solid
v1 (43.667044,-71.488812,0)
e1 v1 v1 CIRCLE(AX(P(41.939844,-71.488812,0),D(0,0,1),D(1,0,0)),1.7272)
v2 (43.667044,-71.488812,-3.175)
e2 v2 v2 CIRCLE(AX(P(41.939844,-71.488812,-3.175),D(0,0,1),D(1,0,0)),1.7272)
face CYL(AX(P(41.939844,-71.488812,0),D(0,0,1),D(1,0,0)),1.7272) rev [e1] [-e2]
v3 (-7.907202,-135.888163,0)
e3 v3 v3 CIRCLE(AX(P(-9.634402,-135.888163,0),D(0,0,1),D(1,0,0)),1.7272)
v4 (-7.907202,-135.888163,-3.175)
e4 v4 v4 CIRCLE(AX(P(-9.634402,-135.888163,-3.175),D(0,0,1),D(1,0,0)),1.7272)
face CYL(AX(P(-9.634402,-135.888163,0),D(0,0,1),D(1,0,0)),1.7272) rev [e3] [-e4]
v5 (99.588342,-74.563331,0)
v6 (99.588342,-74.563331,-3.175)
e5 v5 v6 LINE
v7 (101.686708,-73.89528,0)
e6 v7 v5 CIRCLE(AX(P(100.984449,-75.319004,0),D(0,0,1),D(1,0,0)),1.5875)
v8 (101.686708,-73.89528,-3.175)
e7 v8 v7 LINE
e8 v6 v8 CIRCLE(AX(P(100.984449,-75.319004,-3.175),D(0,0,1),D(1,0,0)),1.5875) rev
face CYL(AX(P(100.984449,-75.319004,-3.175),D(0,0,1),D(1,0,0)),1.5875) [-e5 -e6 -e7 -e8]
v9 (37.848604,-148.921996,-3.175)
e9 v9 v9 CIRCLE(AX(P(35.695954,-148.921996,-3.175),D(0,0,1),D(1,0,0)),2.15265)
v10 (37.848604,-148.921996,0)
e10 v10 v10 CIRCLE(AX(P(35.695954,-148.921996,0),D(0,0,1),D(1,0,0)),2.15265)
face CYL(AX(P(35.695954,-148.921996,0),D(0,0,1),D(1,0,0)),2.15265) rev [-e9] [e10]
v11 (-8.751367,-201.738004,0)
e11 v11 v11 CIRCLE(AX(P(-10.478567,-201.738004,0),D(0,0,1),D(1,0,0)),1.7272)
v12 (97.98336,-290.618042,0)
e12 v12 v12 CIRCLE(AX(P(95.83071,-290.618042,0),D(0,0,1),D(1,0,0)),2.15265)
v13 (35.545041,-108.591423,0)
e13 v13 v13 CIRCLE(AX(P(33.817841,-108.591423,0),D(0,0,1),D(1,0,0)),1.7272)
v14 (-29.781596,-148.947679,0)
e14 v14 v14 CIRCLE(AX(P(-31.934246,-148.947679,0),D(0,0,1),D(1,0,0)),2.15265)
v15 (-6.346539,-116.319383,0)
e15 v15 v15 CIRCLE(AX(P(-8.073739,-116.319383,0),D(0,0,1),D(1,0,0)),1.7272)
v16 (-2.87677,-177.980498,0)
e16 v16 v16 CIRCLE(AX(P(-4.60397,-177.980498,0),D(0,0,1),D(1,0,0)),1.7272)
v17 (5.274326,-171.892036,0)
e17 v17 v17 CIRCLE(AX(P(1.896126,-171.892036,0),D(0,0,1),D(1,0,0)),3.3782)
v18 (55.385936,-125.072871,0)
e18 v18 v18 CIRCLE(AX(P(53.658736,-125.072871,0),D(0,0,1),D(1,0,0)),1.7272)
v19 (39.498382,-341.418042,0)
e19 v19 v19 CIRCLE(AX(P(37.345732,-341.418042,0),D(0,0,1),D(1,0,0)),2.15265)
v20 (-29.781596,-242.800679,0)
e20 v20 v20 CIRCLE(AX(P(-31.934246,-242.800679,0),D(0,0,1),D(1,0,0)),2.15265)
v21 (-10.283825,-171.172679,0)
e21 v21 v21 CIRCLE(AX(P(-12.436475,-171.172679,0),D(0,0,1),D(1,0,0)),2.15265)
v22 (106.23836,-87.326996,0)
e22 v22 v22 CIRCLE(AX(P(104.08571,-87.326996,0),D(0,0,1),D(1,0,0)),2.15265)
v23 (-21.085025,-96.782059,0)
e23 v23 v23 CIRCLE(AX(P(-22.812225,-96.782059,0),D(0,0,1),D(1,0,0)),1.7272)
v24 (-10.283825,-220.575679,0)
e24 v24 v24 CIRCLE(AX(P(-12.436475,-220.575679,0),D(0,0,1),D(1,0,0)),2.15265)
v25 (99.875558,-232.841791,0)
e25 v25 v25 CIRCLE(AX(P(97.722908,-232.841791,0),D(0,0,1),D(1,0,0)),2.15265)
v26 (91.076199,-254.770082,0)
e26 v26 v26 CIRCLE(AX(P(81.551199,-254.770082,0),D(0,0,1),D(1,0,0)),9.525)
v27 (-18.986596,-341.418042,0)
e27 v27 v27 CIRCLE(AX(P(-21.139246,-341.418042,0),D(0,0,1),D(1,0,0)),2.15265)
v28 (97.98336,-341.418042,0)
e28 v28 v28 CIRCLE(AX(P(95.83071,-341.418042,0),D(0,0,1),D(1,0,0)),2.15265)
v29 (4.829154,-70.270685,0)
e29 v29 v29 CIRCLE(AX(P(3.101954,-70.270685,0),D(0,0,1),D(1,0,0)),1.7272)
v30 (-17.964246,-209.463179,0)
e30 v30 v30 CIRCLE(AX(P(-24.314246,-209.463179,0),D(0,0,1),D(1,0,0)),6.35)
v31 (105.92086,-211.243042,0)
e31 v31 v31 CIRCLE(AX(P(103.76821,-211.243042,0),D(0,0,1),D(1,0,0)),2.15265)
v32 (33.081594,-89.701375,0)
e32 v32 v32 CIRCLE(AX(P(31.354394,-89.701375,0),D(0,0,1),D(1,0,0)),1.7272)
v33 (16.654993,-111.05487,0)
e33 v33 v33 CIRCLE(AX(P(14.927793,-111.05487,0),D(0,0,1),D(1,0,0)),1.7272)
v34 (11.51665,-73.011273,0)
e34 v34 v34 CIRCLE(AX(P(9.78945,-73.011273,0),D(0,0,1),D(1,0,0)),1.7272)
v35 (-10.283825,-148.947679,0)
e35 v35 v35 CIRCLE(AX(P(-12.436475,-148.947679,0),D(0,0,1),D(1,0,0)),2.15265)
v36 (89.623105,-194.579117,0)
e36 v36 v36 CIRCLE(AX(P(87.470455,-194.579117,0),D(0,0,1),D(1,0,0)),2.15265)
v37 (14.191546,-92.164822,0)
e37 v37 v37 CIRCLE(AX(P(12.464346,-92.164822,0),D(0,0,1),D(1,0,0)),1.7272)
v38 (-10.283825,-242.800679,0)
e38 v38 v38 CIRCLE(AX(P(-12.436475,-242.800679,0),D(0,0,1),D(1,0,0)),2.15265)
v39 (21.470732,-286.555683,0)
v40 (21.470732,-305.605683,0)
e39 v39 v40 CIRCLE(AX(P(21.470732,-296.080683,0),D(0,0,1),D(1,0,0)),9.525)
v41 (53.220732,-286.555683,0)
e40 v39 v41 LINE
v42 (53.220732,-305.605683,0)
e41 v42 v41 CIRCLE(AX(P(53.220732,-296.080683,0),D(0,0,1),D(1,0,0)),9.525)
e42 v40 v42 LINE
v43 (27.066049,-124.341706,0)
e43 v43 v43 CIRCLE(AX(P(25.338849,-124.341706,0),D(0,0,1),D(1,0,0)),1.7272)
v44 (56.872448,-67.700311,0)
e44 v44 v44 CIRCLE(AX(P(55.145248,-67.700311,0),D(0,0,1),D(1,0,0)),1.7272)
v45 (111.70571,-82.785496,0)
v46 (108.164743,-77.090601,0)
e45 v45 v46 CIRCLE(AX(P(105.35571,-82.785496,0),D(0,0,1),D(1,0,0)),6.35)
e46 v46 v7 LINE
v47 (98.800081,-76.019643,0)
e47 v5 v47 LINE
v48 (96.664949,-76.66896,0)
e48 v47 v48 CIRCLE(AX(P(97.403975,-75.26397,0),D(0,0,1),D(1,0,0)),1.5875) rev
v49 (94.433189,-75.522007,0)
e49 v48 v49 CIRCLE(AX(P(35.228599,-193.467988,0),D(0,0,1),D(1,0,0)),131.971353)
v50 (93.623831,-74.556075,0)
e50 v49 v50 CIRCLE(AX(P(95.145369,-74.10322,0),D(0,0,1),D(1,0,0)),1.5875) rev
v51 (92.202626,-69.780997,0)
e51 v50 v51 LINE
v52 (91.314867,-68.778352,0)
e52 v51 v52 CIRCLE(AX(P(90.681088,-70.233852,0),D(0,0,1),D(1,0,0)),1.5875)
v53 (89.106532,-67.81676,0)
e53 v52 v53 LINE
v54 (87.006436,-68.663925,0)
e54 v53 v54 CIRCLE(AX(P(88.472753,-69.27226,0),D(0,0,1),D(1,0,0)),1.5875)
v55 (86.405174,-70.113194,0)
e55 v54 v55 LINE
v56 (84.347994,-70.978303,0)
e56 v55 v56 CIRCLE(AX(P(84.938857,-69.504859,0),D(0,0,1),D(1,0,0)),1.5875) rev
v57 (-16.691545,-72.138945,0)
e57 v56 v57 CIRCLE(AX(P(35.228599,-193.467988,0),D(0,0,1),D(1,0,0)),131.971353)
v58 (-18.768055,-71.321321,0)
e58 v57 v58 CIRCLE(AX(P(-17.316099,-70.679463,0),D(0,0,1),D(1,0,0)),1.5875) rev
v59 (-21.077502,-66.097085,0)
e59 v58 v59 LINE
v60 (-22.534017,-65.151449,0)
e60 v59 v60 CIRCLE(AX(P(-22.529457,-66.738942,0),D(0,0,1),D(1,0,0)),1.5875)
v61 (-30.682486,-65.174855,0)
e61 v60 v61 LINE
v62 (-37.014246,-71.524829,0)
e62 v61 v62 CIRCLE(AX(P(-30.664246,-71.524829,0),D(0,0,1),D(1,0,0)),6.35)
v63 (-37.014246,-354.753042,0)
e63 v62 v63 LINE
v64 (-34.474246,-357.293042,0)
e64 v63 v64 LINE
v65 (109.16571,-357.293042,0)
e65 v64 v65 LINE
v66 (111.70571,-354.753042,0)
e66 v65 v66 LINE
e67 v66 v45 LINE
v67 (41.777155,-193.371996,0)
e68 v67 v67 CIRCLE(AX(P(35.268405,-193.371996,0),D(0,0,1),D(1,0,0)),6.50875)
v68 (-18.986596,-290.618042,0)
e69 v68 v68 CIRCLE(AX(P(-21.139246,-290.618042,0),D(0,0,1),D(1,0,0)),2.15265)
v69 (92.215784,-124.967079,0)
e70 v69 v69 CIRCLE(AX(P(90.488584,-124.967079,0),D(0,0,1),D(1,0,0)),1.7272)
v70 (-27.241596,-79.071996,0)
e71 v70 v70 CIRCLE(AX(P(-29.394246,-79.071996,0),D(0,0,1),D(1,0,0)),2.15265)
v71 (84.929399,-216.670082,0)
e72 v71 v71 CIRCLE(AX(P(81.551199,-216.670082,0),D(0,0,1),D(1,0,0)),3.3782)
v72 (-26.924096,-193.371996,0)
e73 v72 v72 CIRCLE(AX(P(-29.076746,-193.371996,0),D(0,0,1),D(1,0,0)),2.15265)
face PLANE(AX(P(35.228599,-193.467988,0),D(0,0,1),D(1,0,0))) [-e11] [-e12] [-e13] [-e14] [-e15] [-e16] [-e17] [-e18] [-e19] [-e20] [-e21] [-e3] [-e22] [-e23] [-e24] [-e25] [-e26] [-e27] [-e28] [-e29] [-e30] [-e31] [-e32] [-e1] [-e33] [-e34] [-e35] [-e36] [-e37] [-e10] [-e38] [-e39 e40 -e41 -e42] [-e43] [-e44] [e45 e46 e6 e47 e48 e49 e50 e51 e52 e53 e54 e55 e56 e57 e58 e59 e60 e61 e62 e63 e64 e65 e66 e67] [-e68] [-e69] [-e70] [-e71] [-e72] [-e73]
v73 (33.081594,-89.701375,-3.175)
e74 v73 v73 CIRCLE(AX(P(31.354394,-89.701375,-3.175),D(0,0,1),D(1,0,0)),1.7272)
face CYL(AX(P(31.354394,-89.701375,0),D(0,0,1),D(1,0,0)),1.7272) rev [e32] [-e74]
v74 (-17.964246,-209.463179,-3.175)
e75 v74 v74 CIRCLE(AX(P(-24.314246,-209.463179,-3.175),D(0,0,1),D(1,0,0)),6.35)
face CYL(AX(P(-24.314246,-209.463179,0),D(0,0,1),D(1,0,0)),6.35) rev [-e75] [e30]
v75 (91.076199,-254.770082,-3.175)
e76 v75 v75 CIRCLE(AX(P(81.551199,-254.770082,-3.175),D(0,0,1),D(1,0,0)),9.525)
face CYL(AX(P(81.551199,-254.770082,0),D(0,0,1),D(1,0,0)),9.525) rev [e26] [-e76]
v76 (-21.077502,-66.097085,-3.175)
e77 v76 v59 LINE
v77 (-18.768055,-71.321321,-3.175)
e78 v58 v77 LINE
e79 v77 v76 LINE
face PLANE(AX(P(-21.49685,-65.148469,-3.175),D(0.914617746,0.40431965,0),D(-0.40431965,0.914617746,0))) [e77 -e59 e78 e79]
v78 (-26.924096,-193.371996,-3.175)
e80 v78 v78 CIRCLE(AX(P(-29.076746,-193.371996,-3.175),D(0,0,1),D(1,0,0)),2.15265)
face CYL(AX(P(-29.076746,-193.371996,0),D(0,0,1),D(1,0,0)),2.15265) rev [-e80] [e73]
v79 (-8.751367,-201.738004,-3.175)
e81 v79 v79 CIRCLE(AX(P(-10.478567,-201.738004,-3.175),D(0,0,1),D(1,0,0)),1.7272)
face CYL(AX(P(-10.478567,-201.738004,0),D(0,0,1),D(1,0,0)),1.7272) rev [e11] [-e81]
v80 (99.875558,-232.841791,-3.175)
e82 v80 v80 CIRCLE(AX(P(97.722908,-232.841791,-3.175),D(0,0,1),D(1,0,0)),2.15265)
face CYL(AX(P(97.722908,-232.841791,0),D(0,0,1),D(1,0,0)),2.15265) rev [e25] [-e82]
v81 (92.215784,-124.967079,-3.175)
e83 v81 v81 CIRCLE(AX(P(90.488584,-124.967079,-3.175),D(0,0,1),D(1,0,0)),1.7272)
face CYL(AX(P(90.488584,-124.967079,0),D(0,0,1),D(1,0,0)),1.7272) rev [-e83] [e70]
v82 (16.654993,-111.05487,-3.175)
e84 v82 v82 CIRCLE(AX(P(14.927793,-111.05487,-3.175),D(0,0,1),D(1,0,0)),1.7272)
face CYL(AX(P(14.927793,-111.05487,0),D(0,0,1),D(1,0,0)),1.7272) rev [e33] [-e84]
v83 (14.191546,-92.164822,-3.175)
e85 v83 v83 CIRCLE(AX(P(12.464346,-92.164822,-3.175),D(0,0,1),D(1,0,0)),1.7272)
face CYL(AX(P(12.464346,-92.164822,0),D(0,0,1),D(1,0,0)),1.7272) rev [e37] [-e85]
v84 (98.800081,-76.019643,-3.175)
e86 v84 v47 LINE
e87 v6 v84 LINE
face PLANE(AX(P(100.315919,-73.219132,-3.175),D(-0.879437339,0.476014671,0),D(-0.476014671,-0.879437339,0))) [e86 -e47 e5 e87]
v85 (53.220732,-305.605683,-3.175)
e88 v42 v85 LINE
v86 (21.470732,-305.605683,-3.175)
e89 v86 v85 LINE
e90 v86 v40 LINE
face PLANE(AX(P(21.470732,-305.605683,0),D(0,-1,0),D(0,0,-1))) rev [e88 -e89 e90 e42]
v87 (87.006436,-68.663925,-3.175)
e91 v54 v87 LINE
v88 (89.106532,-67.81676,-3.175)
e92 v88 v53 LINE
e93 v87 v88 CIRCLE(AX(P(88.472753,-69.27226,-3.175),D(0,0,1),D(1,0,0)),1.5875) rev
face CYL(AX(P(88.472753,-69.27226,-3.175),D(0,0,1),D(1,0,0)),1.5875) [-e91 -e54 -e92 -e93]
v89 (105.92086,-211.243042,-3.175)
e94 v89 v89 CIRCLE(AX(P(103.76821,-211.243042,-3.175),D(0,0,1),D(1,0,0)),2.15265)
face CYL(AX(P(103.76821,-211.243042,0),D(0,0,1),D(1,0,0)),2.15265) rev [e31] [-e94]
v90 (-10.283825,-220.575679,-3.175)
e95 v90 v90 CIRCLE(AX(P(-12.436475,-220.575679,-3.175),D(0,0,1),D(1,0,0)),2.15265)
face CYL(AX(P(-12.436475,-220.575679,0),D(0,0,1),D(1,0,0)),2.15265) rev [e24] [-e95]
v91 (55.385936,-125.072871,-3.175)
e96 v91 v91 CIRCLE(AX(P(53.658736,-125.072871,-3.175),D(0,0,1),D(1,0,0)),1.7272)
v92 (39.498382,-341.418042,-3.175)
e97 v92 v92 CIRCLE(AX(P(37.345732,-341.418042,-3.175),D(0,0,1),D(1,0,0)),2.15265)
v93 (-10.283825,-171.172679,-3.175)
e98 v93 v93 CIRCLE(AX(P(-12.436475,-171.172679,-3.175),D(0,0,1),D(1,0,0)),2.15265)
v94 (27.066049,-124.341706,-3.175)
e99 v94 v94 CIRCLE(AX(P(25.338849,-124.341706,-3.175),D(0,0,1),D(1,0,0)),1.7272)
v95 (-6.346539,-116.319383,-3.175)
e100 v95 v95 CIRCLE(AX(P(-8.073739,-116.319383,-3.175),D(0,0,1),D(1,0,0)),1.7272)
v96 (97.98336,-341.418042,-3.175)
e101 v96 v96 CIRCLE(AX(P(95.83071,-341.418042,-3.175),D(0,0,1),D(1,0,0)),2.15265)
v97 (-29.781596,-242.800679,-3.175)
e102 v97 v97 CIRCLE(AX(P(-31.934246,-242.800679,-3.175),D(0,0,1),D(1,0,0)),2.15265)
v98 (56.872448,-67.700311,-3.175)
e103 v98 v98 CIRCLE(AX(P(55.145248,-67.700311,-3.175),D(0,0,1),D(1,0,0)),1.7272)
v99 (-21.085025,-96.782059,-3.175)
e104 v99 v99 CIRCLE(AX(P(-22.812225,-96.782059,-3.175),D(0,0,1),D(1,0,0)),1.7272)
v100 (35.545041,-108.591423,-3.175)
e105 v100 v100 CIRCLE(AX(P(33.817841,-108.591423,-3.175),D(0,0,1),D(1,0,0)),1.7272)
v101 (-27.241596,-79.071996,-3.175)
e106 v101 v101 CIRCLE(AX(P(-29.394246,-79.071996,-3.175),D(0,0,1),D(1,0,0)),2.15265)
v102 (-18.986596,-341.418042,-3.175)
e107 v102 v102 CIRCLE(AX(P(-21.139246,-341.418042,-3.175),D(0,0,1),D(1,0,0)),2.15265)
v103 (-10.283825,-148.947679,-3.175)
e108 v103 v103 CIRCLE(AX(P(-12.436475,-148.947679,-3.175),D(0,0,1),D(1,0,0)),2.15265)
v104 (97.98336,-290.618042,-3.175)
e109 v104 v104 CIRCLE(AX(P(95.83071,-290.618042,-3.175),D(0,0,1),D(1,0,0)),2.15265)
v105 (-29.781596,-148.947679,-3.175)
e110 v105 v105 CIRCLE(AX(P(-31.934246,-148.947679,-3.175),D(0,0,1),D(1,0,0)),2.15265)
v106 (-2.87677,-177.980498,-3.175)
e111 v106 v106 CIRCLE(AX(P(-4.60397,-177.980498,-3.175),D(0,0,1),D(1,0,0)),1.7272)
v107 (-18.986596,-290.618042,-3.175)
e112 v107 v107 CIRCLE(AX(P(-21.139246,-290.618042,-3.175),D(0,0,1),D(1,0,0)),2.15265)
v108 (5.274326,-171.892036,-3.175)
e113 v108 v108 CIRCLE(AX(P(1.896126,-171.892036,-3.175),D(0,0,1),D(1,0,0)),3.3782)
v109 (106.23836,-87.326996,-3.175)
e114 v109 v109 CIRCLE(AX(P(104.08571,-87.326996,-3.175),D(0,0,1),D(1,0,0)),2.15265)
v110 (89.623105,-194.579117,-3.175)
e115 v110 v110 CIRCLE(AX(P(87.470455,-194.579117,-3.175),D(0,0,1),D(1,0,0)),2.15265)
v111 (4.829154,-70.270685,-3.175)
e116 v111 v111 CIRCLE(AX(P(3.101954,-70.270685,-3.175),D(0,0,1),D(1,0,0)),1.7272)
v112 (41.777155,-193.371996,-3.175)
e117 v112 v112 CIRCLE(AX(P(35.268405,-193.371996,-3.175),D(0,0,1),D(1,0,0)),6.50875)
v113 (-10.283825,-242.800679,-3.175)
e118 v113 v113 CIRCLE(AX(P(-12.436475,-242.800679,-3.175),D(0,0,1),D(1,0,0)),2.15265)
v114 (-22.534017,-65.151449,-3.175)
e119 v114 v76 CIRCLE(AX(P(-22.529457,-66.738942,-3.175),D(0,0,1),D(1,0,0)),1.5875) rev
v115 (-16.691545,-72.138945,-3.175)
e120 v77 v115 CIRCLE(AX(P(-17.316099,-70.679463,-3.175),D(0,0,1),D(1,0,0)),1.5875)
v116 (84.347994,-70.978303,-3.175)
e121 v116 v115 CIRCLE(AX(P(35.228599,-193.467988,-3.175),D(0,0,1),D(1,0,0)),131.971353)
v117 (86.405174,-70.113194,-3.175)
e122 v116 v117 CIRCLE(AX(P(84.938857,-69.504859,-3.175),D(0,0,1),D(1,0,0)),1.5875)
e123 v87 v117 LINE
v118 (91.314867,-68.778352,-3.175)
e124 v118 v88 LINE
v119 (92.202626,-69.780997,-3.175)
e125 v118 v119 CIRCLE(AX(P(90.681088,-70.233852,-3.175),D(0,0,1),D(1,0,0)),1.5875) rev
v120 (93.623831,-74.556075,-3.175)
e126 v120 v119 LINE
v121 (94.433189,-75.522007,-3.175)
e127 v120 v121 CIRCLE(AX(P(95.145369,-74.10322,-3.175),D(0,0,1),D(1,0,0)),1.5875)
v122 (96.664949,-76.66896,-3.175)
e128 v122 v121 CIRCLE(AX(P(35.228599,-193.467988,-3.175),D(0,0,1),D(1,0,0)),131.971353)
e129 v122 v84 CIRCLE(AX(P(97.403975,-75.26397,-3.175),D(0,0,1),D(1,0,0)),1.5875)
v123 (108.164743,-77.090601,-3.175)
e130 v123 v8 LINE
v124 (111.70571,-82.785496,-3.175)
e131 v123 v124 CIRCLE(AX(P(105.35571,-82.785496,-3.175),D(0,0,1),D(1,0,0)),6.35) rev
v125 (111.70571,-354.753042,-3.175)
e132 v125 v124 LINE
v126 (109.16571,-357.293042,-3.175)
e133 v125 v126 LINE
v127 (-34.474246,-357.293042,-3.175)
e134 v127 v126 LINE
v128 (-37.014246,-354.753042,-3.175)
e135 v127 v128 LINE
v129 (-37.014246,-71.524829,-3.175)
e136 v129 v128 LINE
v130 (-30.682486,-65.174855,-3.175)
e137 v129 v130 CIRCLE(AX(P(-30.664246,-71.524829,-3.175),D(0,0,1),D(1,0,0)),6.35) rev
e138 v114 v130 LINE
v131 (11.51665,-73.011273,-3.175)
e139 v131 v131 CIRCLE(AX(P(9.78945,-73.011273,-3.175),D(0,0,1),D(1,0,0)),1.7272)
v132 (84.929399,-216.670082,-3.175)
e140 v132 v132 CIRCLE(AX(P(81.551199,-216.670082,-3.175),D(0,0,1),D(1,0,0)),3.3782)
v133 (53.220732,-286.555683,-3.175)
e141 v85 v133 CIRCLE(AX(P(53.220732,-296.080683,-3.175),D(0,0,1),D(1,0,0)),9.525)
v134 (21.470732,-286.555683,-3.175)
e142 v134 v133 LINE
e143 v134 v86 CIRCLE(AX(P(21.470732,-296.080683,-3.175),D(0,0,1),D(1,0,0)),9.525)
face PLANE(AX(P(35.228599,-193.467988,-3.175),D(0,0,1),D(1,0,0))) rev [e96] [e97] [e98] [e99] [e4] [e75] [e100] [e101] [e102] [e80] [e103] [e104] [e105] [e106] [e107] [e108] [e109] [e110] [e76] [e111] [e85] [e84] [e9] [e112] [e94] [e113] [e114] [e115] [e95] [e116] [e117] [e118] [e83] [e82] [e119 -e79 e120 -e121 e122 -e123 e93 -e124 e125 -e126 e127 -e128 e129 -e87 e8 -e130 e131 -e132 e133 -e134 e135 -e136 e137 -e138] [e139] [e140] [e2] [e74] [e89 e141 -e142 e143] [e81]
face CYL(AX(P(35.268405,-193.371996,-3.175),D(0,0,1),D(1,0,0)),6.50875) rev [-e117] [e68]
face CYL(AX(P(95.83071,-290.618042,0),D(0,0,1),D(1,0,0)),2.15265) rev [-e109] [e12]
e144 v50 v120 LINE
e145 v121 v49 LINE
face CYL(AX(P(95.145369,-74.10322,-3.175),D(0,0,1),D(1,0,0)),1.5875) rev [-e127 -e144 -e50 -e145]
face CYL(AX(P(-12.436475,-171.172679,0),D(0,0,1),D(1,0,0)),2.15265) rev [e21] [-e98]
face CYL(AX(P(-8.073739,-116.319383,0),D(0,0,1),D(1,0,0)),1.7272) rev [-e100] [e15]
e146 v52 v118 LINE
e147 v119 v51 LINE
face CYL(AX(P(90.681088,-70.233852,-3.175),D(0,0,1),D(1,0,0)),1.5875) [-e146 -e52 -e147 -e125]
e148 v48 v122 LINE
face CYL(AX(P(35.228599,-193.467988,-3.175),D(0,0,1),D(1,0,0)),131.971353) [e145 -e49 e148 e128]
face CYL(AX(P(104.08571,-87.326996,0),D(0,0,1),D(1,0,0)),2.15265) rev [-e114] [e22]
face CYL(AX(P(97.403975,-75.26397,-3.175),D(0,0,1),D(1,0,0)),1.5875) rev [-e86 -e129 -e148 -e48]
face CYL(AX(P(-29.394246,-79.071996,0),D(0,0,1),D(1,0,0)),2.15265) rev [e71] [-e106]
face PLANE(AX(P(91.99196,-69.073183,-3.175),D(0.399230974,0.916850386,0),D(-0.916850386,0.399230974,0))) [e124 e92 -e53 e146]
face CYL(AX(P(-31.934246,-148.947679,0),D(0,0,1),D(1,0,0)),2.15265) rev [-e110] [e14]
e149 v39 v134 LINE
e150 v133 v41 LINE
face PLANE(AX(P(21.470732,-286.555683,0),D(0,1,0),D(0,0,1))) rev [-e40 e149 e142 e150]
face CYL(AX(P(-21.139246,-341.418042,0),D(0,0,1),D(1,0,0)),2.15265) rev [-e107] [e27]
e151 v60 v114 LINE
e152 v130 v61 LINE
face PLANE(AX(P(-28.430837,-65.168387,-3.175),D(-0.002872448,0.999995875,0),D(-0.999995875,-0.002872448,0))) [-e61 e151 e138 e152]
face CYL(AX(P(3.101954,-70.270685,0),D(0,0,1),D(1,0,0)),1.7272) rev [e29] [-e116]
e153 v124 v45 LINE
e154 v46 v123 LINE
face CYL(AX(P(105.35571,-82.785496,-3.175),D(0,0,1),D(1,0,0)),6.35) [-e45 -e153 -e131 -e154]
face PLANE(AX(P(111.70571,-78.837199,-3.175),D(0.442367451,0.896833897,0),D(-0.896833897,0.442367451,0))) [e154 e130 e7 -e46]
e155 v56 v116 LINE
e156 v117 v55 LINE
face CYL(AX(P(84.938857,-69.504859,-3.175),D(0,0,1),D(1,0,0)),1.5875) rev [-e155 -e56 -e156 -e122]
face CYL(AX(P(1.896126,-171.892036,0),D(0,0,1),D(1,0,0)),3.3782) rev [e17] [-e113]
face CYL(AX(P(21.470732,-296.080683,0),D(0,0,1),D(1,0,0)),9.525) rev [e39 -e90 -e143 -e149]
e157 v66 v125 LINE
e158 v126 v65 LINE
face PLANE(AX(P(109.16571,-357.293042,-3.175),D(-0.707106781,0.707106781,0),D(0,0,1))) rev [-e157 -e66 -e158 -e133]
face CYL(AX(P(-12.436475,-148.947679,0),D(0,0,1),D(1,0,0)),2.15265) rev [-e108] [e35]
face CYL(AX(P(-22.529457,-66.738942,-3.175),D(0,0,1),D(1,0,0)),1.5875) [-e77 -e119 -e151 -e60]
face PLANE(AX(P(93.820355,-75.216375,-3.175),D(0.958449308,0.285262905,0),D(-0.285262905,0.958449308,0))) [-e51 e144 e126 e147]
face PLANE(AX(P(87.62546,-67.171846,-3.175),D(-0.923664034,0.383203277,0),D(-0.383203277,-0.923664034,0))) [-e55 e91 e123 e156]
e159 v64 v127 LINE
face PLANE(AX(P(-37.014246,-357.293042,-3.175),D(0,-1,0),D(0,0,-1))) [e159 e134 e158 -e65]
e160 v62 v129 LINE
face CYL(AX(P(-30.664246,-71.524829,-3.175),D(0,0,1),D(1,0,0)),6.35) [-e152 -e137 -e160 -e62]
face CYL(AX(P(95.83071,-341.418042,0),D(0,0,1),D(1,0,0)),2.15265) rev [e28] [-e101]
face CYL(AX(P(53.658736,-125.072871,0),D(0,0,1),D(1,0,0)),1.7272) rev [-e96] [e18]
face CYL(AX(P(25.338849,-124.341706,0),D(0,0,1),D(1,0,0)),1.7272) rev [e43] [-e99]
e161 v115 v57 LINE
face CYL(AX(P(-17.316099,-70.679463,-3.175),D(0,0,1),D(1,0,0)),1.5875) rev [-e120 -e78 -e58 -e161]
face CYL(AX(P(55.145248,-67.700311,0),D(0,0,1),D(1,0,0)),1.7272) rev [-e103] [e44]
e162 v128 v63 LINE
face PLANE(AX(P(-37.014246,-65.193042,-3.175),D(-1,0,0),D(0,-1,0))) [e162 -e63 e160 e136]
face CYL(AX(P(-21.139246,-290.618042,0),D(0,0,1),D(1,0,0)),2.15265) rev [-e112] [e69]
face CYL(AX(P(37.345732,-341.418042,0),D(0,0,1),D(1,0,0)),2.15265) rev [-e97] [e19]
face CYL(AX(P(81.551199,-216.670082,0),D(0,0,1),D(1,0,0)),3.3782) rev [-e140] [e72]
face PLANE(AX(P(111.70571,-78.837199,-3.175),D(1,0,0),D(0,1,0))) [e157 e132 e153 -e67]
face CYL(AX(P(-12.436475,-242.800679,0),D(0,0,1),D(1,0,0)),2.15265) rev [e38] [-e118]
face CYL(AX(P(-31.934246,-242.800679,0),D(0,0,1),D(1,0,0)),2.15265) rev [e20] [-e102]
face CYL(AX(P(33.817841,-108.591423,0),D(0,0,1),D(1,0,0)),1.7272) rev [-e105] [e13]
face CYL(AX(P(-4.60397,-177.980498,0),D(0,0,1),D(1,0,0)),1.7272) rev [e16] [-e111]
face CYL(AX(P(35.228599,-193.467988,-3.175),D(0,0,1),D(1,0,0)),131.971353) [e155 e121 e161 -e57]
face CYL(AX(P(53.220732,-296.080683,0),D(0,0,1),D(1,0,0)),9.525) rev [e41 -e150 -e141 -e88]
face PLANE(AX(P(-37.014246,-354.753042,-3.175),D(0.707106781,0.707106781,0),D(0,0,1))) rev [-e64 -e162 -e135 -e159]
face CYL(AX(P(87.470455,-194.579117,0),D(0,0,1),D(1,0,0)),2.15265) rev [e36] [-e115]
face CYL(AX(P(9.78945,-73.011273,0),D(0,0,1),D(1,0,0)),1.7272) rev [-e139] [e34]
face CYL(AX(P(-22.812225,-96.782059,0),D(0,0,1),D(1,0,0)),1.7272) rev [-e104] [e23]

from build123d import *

# Parameters (mm, degrees)
BOSS_EXTRUDE1_DEPTH             = 3.175
SKETCH2_R                       = 6.50875
CUT_EXTRUDE1_DEPTH              = 268.458155353
F_4_CLEARANCE_HOLE1_D           = 3.4544
F_6_CLEARANCE_HOLE2_D           = 4.3053
F_4_CLEARANCE_HOLE2_D           = 3.4544
F_1_4_CLEARANCE_HOLE2_D         = 6.7564
SKETCH15_W                      = 148.719955274
SKETCH15_H                      = 114.3
BOSS_EXTRUDE2_DEPTH             = 3.175
F_6_CLEARANCE_HOLE3_D           = 4.3053
CHAMFER1_SIZE                   = 2.54
F_6_CLEARANCE_HOLE4_D           = 4.3053
F_4_CLEARANCE_HOLE3_D           = 3.4544
F_6_CLEARANCE_HOLE1_D           = 4.3053
DELETEFACE1_START               = -3.175
DELETEFACE1_OUTLINE_R           = 2.15265
DELETEFACE1_DEPTH               = 3.175
F_1_2_0_5_DIAMETER_HOLE1_D      = 12.7
F_1_4_CLEARANCE_HOLE1_D         = 6.7564
F_3_4_0_75_DIAMETER_HOLE1_D     = 19.05
F_3_4_START                     = -3.175
F_3_4_0_75_DIAMETER_SLOT1_DEPTH = 3.175
FILLET1_R                       = 1.5875
FILLET2_R                       = 6.35


# Read off the part's stored shape, not the designer's step: DeleteFace1, 3/4 (0.75) Diameter Slot1
with BuildPart() as part:
    # Sketch1 → Boss-Extrude1 (new body)
    with BuildSketch(Plane.XY):
        with BuildLine():
            Line((-37.014245685, -65.193042462), (-37.014245685, -242.993042462))
            Line((-37.014245685, -242.993042462), (111.705709589, -242.993042462))
            Line((111.705709589, -242.993042462), (111.705709589, -78.837199032))
            Line((111.705709589, -78.837199032), (100.315919098, -73.219132409))
            Line((100.315919098, -73.219132409), (98.04889923, -77.407452736))
            ThreePointArc((98.04889923, -77.407452736), (95.944511883, -76.292837527), (93.820355363, -75.216374688))
            Line((93.820355363, -75.216374688), (91.991959695, -69.073183497))
            Line((91.991959695, -69.073183497), (87.625459733, -67.171845985))
            Line((87.625459733, -67.171845985), (85.800454124, -71.570795948))
            ThreePointArc((85.800454124, -71.570795948), (33.712742218, -61.505341345), (-18.130011823, -72.76464689))
            Line((-18.130011823, -72.76464689), (-20.055584156, -68.408779876))
            Line((-20.055584156, -68.408779876), (-21.49685031, -65.148469374))
            Line((-21.49685031, -65.148469374), (-28.430836618, -65.168386968))
            Line((-28.430836618, -65.168386968), (-37.014245685, -65.193042462))
        make_face()
    extrude(amount=-BOSS_EXTRUDE1_DEPTH)

    # Sketch2 → Cut-Extrude1 (cut, through all)
    with BuildSketch(Plane.XY):
        with Locations((35.268404938, -193.371995598)):
            Circle(SKETCH2_R)
    extrude(amount=-CUT_EXTRUDE1_DEPTH, mode=Mode.SUBTRACT)

    # #4 Clearance Hole1 (through all)
    with Locations(Plane.XY):
        with Locations((41.939844363, -71.488811907), (9.789450293, -73.011273216), (90.488583573, -124.967078721), (53.658735514, -125.072870965), (25.338848707, -124.341705755), (-9.634401538, -135.888162669), (55.145248163, -67.700310852), (3.101953943, -70.270684884)):
            Hole(F_4_CLEARANCE_HOLE1_D / 2)

    # #6 Clearance Hole2 (through all)
    with Locations(Plane.XY):
        with Locations((-29.394245685, -79.071995598), (104.085709589, -87.326995598), (35.695953558, -148.921995598), (26.485754315, -79.071995598)):
            Hole(F_6_CLEARANCE_HOLE2_D / 2)

    # #4 Clearance Hole2 (through all)
    with Locations(Plane.XY):
        with Locations((-8.073739309, -116.319383279), (-22.812224861, -96.782058908), (-10.478566815, -201.738004366), (-4.603970045, -177.980497914)):
            Hole(F_4_CLEARANCE_HOLE2_D / 2)

    # 1/4 Clearance Hole2 (through all)
    with Locations(Plane.XY):
        with Locations((81.551198953, -216.670082089)):
            Hole(F_1_4_CLEARANCE_HOLE2_D / 2)

    # Sketch15 → Boss-Extrude2 (add, through all)
    with BuildSketch(Plane.XY):
        with Locations((37.345731952, -300.143042462)):
            Rectangle(SKETCH15_W, SKETCH15_H)
    extrude(amount=-BOSS_EXTRUDE2_DEPTH)

    # #6 Clearance Hole3 (through all)
    with Locations(Plane.XY):
        with Locations((-29.076745685, -193.371995598), (103.768209589, -211.243042462), (87.470455138, -194.579117263), (97.722907594, -232.841790729)):
            Hole(F_6_CLEARANCE_HOLE3_D / 2)

    # Chamfer1
    chamfer1_edges = [part.edges().sort_by_distance(p)[0] for p in [
        (-37.014245685, -357.293042462, -1.5875),
        (111.705709589, -357.293042462, -1.5875),
    ]]
    chamfer(chamfer1_edges, length=CHAMFER1_SIZE)

    # #6 Clearance Hole4 (through all)
    with Locations(Plane.XY):
        with Locations((95.830709589, -341.418042462), (37.345731952, -341.418042462), (-21.139245685, -341.418042462), (95.830709589, -290.618042462), (-21.139245685, -290.618042462)):
            Hole(F_6_CLEARANCE_HOLE4_D / 2)

    # #4 Clearance Hole3 (through all)
    with Locations(Plane.XY):
        with Locations((31.354393952, -89.701374676), (12.464345577, -92.164821934), (14.927792835, -111.054870309), (33.81784121, -108.591423051)):
            Hole(F_4_CLEARANCE_HOLE3_D / 2)

    # #6 Clearance Hole1 (through all)
    with Locations(Plane.XY):
        with Locations((-12.436474575, -171.172679278), (-12.436474575, -148.947679278), (-31.934245685, -148.947679278), (-31.934245685, -242.800679278), (-12.436474575, -242.800679278), (-12.436474575, -220.575679278)):
            Hole(F_6_CLEARANCE_HOLE1_D / 2)

    # DeleteFace1 outline → DeleteFace1 (add)
    with BuildSketch(Plane.XY.offset(DELETEFACE1_START)):
        with Locations((26.485754315, -79.071995598)):
            Circle(DELETEFACE1_OUTLINE_R)
    extrude(amount=DELETEFACE1_DEPTH)

    # 1/2 (0.5) Diameter Hole1 (through all)
    with Locations(Plane.XY):
        with Locations((-24.314245685, -209.463179278)):
            Hole(F_1_2_0_5_DIAMETER_HOLE1_D / 2)

    # 1/4 Clearance Hole1 (through all)
    with Locations(Plane.XY):
        with Locations((1.896126146, -171.892035997)):
            Hole(F_1_4_CLEARANCE_HOLE1_D / 2)

    # 3/4 (0.75) Diameter Hole1 (through all)
    with Locations(Plane.XY):
        with Locations((81.551198953, -254.770082089)):
            Hole(F_3_4_0_75_DIAMETER_HOLE1_D / 2)

    # 3/4 (0.75) Diameter Slot1 outline → 3/4 (0.75) Diameter Slot1 (cut)
    with BuildSketch(Plane.XY.offset(F_3_4_START)):
        with BuildLine():
            Line((21.470731952, -305.605683453), (53.220731952, -305.605683453))
            ThreePointArc((53.220731952, -305.605683453), (62.745731952, -296.080683453), (53.220731952, -286.555683453))
            Line((53.220731952, -286.555683453), (21.470731952, -286.555683453))
            ThreePointArc((21.470731952, -286.555683453), (11.945731952, -296.080683453), (21.470731952, -305.605683453))
        make_face()
    extrude(amount=F_3_4_0_75_DIAMETER_SLOT1_DEPTH, mode=Mode.SUBTRACT)

    # Fillet1
    fillet1_edges = [part.edges().sort_by_distance(p)[0] for p in [
        (-21.49685031, -65.148469374, -1.5875),
        (-18.130011823, -72.76464689, -1.5875),
        (85.800454124, -71.570795948, -1.5875),
        (87.625459733, -67.171845985, -1.5875),
        (91.991959695, -69.073183497, -1.5875),
        (93.820355363, -75.216374688, -1.5875),
        (98.04889923, -77.407452736, -1.5875),
        (100.315919098, -73.219132409, -1.5875),
    ]]
    fillet(fillet1_edges, radius=FILLET1_R)

    # Fillet2
    fillet2_edges = [part.edges().sort_by_distance(p)[0] for p in [
        (111.705709589, -78.837199032, -1.5875),
        (-37.014245685, -65.193042462, -1.5875),
    ]]
    fillet(fillet2_edges, radius=FILLET2_R)


solid = part.part
